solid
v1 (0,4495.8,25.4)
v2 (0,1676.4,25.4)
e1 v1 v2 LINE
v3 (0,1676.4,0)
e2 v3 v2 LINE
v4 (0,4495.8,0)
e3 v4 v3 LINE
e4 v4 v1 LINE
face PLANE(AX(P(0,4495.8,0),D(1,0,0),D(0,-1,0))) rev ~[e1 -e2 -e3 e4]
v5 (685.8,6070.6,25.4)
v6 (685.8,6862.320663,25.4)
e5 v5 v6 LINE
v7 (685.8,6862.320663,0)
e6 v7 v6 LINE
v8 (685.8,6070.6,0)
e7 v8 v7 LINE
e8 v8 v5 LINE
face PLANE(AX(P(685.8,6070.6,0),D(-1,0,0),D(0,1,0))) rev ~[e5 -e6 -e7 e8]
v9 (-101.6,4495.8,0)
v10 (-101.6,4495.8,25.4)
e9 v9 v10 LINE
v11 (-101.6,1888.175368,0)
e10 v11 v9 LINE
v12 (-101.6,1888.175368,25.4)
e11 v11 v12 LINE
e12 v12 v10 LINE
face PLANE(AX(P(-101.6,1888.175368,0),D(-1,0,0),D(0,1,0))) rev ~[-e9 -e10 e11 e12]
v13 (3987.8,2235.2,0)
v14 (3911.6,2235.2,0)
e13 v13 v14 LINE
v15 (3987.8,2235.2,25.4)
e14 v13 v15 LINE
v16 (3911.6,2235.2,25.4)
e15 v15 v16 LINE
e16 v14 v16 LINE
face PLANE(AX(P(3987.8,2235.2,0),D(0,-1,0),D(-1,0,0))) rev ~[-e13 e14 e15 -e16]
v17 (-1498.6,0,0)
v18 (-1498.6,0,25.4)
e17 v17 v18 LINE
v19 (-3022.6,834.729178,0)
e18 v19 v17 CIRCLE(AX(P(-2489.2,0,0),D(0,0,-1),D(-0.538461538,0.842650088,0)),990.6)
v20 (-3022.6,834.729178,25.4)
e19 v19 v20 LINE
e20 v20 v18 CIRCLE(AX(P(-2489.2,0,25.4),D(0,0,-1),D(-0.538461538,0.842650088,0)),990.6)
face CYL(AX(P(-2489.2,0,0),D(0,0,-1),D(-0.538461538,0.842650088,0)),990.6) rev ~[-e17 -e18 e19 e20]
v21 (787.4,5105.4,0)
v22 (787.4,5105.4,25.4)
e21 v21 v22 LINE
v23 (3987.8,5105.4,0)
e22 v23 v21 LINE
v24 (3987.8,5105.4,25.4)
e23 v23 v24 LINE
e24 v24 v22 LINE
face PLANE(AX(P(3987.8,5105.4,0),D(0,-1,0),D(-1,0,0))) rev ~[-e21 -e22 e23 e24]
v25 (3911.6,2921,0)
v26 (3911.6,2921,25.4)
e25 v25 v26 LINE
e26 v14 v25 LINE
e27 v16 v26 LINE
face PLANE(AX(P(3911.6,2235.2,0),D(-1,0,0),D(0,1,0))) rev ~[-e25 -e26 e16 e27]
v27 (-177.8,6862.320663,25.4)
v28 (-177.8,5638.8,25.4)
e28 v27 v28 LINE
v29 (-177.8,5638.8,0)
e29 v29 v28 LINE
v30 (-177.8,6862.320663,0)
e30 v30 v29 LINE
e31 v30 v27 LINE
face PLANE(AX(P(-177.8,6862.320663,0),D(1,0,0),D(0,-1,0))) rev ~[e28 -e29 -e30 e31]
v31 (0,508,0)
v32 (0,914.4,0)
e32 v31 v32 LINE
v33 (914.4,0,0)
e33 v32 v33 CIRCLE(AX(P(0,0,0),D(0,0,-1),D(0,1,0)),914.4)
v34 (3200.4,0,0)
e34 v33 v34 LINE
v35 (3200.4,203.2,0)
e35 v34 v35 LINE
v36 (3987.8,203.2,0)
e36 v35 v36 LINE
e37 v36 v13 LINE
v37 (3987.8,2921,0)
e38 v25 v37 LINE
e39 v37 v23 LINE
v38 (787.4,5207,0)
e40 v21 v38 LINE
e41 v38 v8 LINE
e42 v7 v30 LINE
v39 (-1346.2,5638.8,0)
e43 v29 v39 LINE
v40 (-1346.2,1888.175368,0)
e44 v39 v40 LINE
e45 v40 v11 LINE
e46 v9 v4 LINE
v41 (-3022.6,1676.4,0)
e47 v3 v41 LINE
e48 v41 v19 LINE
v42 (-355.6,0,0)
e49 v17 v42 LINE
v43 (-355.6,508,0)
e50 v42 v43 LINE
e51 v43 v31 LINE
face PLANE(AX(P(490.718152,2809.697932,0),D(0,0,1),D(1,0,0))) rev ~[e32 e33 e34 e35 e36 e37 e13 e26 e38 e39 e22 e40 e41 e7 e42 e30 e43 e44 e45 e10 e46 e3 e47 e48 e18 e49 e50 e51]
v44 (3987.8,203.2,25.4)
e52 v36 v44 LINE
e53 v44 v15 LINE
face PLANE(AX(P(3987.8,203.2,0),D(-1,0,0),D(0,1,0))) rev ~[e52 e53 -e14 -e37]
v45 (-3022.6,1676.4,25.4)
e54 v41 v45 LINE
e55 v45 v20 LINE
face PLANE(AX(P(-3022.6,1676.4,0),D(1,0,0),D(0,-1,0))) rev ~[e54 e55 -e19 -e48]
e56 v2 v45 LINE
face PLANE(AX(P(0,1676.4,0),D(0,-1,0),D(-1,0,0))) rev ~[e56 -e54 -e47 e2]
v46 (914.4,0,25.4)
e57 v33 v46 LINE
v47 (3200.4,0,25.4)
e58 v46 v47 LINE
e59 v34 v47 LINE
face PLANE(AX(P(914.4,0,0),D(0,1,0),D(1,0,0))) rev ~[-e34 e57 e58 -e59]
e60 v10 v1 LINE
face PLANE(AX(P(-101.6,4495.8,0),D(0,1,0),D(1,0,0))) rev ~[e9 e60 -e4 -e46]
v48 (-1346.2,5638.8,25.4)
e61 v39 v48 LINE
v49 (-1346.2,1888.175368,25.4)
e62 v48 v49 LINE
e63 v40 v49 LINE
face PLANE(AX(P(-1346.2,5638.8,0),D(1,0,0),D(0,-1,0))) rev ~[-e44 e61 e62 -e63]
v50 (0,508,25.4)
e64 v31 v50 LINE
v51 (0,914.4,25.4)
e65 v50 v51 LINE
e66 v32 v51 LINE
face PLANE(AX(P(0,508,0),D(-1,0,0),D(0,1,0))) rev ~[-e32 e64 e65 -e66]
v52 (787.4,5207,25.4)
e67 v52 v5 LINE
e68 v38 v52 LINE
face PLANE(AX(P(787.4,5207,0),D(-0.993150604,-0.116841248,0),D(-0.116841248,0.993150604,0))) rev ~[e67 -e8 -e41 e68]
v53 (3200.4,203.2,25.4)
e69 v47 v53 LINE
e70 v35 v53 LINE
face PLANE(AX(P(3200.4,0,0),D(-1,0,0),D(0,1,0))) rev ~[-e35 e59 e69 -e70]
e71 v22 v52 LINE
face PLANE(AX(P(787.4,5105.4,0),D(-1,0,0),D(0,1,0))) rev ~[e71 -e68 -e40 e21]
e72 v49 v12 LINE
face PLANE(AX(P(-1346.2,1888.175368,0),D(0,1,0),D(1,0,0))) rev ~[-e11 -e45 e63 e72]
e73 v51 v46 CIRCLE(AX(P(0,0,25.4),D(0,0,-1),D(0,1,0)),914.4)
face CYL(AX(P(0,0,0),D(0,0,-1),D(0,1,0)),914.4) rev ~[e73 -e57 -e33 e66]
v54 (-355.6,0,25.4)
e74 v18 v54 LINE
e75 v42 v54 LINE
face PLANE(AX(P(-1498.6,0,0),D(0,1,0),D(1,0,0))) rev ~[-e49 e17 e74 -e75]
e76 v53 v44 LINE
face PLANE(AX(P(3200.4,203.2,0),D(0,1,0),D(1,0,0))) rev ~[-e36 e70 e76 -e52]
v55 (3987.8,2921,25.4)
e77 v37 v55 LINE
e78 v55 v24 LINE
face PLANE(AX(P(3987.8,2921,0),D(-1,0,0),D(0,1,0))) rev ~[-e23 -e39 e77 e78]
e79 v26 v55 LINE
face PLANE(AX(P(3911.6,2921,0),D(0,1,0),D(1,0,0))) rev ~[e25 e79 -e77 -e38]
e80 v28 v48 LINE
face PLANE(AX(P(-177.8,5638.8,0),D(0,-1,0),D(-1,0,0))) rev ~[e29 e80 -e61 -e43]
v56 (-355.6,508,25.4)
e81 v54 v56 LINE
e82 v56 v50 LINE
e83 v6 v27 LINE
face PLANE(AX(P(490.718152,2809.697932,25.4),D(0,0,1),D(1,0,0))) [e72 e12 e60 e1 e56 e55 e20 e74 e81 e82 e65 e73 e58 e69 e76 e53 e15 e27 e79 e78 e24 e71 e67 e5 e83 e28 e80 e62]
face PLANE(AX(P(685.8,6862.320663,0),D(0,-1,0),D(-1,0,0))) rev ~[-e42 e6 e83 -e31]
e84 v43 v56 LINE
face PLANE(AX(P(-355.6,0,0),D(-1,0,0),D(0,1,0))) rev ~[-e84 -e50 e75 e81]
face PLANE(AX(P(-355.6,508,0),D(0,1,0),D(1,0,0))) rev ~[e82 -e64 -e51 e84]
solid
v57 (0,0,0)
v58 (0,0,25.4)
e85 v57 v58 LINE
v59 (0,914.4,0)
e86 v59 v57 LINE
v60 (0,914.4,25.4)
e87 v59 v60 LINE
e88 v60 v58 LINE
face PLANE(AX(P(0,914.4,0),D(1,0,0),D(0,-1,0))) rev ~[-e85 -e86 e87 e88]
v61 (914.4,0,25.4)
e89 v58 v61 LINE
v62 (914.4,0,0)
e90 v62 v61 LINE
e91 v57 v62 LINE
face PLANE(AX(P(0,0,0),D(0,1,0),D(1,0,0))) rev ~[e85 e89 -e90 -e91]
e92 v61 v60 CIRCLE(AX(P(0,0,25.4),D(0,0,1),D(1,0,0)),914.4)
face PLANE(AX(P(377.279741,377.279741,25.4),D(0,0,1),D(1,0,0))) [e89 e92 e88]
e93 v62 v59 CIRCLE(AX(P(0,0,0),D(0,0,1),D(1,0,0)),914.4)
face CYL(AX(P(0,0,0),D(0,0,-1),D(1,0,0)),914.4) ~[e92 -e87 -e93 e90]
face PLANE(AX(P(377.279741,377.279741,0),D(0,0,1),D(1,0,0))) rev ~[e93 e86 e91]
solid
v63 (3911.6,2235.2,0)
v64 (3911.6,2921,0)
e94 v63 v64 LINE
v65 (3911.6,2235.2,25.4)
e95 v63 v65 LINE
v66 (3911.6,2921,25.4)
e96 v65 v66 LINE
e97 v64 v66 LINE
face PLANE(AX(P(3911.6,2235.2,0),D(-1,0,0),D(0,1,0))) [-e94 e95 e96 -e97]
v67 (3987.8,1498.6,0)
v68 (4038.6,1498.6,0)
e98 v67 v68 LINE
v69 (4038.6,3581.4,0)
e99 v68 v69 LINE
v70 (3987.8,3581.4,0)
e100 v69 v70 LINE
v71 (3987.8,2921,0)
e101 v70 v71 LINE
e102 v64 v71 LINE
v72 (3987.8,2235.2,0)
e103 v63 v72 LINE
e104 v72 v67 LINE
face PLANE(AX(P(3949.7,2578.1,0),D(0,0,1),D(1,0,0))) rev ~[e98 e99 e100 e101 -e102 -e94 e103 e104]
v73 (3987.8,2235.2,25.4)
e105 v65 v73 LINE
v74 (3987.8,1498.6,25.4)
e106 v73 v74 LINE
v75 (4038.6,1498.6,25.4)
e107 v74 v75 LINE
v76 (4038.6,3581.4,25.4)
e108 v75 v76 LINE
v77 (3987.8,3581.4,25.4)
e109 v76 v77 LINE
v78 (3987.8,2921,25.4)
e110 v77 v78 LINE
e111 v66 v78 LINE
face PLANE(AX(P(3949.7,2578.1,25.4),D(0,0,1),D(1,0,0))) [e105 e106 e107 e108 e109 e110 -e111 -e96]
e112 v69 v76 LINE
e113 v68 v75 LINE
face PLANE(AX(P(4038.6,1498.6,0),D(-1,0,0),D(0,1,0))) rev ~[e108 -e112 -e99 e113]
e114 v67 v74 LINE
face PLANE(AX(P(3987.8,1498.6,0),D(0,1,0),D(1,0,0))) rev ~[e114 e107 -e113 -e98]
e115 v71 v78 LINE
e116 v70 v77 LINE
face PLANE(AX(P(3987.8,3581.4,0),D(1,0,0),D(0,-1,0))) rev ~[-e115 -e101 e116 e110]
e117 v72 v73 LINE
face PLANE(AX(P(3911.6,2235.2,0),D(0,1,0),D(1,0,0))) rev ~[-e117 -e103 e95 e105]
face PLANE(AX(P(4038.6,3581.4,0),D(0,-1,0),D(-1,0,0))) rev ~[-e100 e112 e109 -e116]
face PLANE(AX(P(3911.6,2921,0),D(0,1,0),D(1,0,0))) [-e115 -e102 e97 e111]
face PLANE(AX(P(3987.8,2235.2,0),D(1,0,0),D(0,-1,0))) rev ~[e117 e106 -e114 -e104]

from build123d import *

# Parameters (mm, degrees)
F1_DEPTH = 25.4
F0_W     = 76.2
F0_H     = 685.8
F2_DEPTH = 25.4
F3_DEPTH = 25.4


# Not quite as in the source:
# - a feature names something its author has since deleted; it is built from what else it names


with BuildPart() as f1:
    # F0 (on Top) → F1 (new body)
    with BuildSketch(Plane.XY):
        with BuildLine():
            Line((914.4, 0), (3200.4, 0))
            Line((3200.4, 0), (3200.4, 203.2))
            Line((3200.4, 203.2), (3987.8, 203.2))
            Line((3987.8, 203.2), (3987.8, 1498.6))
            Line((3987.8, 1498.6), (3987.8, 2235.2))
            Line((3987.8, 2235.2), (3911.6, 2235.2))
            Line((3911.6, 2235.2), (3911.6, 2921))
            Line((3911.6, 2921), (3987.8, 2921))
            Line((3987.8, 2921), (3987.8, 3581.4))
            Line((3987.8, 3581.4), (3987.8, 5105.4))
            Line((3987.8, 5105.4), (787.4, 5105.4))
            Line((787.4, 5105.4), (787.4, 5207))
            Line((787.4, 5207), (701.3347370419, 5938.5547351442))
            Line((701.3347370419, 5938.5547351442), (685.8, 6070.6))
            Line((685.8, 6070.6), (685.8, 6862.3206634521))
            Line((685.8, 6862.3206634521), (-177.8, 6862.3206634521))
            Line((-177.8, 6862.3206634521), (-177.8, 6477))
            Line((-177.8, 6477), (-177.8, 5740.4))
            Line((-177.8, 5740.4), (-177.8, 5638.8))
            Line((-177.8, 5638.8), (-1346.2, 5638.8))
            Line((-1346.2, 5638.8), (-1346.2, 1888.175368309))
            Line((-1346.2, 1888.175368309), (-101.6, 1888.175368309))
            Line((-101.6, 1888.175368309), (-101.6, 4495.8))
            Line((-101.6, 4495.8), (0, 4495.8))
            Line((0, 4495.8), (0, 1676.4))
            Line((0, 1676.4), (-3022.6, 1676.4))
            Line((-3022.6, 1676.4), (-3022.6, 834.7291776379))
            ThreePointArc((-3022.6, 834.7291776379), (-2013.331152522, 868.8136739255), (-1498.6, 0))
            Line((-1498.6, 0), (-355.6, 0))
            Line((-355.6, 0), (-355.6, 508))
            Line((-355.6, 508), (0, 508))
            Line((0, 508), (0, 914.4))
            ThreePointArc((0, 914.4), (646.578440717, 646.578440717), (914.4, 0))
        make_face()
    extrude(amount=F1_DEPTH)


with BuildPart() as f2:
    # F0 (on Top) → F2 (new body)
    with BuildSketch(Plane.XY):
        with Locations((3949.7, 2578.1)):
            Rectangle(F0_W, F0_H)
        Polygon((3987.8, 2235.2), (3987.8, 1498.6), (4038.6, 1498.6), (4038.6, 3581.4), (3987.8, 3581.4), (3987.8, 2921), align=None)
    extrude(amount=F2_DEPTH)


with BuildPart() as f3:
    # F0 (on Top) → F3 (new body)
    with BuildSketch(Plane.XY):
        with BuildLine():
            Line((0, 0), (914.4, 0))
            ThreePointArc((914.4, 0), (646.578440717, 646.578440717), (0, 914.4))
            Line((0, 914.4), (0, 508))
            Line((0, 508), (0, 0))
        make_face()
    extrude(amount=F3_DEPTH)


solid = Compound([f1.part, f2.part, f3.part])
